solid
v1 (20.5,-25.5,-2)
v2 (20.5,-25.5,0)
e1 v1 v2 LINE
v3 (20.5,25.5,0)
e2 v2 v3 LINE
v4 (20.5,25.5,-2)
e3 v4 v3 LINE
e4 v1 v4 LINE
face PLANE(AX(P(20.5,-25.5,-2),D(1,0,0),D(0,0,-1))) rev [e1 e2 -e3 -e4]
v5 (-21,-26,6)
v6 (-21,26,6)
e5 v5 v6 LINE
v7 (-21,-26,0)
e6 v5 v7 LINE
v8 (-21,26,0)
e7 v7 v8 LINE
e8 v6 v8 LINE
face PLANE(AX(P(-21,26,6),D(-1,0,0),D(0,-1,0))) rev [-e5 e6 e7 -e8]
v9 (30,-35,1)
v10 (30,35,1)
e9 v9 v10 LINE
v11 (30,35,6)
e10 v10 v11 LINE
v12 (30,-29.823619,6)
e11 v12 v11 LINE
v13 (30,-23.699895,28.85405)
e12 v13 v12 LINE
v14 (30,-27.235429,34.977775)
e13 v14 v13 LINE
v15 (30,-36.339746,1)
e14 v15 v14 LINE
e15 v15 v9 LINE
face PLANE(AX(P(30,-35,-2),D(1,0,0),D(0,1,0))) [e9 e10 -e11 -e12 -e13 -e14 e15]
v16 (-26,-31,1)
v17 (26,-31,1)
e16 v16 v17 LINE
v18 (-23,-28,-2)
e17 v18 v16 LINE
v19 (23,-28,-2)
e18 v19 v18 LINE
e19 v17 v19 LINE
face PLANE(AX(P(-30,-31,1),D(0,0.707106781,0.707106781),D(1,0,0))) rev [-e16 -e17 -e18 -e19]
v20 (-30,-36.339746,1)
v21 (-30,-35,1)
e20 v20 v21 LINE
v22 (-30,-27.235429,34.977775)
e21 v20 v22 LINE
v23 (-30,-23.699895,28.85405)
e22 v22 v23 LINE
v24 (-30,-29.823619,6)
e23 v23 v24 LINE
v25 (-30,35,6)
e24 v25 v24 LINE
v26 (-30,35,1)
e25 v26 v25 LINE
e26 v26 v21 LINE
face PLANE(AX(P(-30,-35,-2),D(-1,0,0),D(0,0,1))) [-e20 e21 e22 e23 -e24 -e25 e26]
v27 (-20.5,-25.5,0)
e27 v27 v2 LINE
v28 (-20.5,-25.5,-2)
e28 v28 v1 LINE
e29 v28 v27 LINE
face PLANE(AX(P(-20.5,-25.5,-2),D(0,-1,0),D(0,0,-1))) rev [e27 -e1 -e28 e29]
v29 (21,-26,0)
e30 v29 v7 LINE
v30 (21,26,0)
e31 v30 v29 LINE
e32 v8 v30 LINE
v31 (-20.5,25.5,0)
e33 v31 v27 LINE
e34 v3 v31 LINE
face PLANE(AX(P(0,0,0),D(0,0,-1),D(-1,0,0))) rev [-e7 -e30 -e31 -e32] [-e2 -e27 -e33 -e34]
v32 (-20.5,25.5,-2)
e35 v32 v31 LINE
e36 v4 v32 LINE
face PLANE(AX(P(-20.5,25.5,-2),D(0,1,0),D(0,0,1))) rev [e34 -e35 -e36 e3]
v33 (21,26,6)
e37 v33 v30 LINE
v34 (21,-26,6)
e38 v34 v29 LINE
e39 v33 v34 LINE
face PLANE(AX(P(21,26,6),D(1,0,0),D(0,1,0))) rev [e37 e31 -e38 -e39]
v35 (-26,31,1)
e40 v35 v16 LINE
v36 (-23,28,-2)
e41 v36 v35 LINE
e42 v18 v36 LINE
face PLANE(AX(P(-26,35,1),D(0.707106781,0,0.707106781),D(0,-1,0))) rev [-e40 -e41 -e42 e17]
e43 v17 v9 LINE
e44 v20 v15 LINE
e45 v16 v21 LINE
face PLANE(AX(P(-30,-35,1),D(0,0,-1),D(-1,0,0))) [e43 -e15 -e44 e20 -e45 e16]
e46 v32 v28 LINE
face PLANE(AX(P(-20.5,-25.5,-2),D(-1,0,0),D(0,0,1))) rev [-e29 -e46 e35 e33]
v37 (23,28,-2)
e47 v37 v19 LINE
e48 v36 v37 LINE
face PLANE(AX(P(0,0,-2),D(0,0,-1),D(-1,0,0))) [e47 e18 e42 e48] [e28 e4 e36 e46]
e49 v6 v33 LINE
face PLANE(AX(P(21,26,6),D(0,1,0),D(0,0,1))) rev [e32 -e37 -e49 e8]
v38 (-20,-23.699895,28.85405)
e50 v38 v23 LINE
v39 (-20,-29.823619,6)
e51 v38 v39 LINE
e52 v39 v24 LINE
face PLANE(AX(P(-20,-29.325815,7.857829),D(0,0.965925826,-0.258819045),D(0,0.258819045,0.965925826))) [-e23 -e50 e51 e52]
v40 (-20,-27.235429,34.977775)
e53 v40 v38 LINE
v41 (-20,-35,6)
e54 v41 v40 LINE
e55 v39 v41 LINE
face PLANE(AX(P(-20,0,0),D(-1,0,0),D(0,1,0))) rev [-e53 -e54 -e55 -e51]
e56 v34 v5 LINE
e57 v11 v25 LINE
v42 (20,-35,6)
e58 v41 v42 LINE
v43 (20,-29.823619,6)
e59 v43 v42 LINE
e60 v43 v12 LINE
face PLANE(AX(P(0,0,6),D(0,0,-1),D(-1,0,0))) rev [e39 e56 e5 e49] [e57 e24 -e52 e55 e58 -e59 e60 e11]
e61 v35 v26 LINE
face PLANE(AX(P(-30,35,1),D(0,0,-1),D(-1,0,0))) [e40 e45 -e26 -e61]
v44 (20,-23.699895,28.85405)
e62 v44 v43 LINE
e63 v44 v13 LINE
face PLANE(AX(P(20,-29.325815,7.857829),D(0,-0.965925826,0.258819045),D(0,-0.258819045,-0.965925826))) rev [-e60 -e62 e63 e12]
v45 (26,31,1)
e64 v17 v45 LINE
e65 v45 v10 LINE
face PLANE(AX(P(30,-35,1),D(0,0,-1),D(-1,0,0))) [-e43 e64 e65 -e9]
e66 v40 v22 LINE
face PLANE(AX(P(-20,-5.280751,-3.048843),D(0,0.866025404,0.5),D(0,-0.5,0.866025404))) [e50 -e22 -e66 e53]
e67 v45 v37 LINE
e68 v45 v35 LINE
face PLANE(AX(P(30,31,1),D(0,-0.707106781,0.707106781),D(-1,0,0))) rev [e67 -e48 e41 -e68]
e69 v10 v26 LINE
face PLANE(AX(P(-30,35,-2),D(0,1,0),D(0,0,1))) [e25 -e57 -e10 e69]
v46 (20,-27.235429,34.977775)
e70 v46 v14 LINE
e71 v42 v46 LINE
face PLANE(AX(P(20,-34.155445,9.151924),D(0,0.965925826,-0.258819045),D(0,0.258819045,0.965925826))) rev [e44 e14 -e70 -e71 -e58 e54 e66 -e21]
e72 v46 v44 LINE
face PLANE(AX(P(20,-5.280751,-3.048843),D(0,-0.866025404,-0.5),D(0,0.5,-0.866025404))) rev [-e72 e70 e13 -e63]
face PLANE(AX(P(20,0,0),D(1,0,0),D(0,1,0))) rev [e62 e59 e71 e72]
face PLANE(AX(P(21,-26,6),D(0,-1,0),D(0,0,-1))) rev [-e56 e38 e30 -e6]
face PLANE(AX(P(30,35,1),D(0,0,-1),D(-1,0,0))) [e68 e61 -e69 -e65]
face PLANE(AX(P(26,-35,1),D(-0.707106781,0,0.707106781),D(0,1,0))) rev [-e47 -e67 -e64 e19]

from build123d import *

# Parameters (mm, degrees)
EXTRUDE_1_DEPTH      = 6
EXTRUDE_1_DEPTH_BACK = 2
SKETCH_1_W           = 60
SKETCH_1_H           = 70
SKETCH_1_W_2         = 41
SKETCH_1_H_2         = 51
SKETCH_2_W           = 42
SKETCH_2_H           = 52
CUT_EXTRUDE_2_DEPTH  = 47.486557197
SKETCH_3_W           = 4
SKETCH_3_H           = 3
CHAMFER_2_SIZE       = 3
EXTRUDE_2_DEPTH      = 10
EXTRUDE_3_DEPTH      = 60


with BuildPart() as part:
    # Эскиз1 → Бобышка-Вытянуть1 (new, two sides: drawn at the far end of the back side and taken through both)
    with BuildSketch(Plane.XY.offset(-EXTRUDE_1_DEPTH_BACK)):
        Rectangle(SKETCH_1_W, SKETCH_1_H)
        Rectangle(SKETCH_1_W_2, SKETCH_1_H_2, mode=Mode.SUBTRACT)
    extrude(amount=EXTRUDE_1_DEPTH + EXTRUDE_1_DEPTH_BACK)

    # Эскиз2 → Вырез-Вытянуть2 (cut, through all)
    with BuildSketch(Plane(origin=(0, 0, 0), x_dir=(-1, 0, 0), z_dir=(0, 0, -1))):
        Rectangle(SKETCH_2_W, SKETCH_2_H)
    extrude(amount=-CUT_EXTRUDE_2_DEPTH, mode=Mode.SUBTRACT)

    # Вырез-По траектории1: sweep along a path in Эскиз4
    with BuildLine(Plane(origin=(0, 0, -2), x_dir=(-1, 0, 0), z_dir=(0, 0, -1))) as sweep_1_path:
        Line((-30, 35), (-30, -35))
        Line((-30, -35), (30, -35))
        Line((30, -35), (30, 35))
        Line((30, 35), (-30, 35))
    # Эскиз3 → Вырез-По траектории1 (sweep, cut)
    with BuildSketch(Plane(origin=(0, -35, 0), x_dir=(-1, 0, 0), z_dir=(0, -1, 0))):
        with Locations((-28, 0.5)):
            Rectangle(SKETCH_3_W, SKETCH_3_H)
    sweep(path=sweep_1_path.line, transition=Transition.RIGHT, mode=Mode.SUBTRACT)

    # Фаска2
    chamfer_2_edges = [part.edges().sort_by_distance(p)[0] for p in [
        (26, 0, -2),
        (0, 31, -2),
        (-26, 0, -2),
        (0, -31, -2),
    ]]
    chamfer(chamfer_2_edges, length=CHAMFER_2_SIZE - 0.0001)  # a hair under: the kernel refuses the full size

    # Эскиз5 → Бобышка-Вытянуть2 (add)
    with BuildSketch(Plane(origin=(30, 0, 0), x_dir=(0, 0, -1), z_dir=(1, 0, 0))):
        Polygon((-34.977774789, -27.235428647), (-6, -35), (-6, -29.823619098), (-28.854050432, -23.699894741), align=None)
    extrude_2 = extrude(amount=-EXTRUDE_2_DEPTH)

    # Зеркальное отражение1: Бобышка-Вытянуть2 across plane
    add(extrude_2.mirror(Plane(origin=(0, 0, 0), x_dir=(0, 0, 1), z_dir=(1, 0, 0))))

    # Эскиз6 → Бобышка-Вытянуть3 (add)
    with BuildSketch(Plane(origin=(30, 0, 0), x_dir=(0, 0, -1), z_dir=(1, 0, 0))):
        Polygon((-6, -35), (-1, -36.339745962), (-1, -35), align=None)
    extrude(amount=-EXTRUDE_3_DEPTH)


solid = part.part
